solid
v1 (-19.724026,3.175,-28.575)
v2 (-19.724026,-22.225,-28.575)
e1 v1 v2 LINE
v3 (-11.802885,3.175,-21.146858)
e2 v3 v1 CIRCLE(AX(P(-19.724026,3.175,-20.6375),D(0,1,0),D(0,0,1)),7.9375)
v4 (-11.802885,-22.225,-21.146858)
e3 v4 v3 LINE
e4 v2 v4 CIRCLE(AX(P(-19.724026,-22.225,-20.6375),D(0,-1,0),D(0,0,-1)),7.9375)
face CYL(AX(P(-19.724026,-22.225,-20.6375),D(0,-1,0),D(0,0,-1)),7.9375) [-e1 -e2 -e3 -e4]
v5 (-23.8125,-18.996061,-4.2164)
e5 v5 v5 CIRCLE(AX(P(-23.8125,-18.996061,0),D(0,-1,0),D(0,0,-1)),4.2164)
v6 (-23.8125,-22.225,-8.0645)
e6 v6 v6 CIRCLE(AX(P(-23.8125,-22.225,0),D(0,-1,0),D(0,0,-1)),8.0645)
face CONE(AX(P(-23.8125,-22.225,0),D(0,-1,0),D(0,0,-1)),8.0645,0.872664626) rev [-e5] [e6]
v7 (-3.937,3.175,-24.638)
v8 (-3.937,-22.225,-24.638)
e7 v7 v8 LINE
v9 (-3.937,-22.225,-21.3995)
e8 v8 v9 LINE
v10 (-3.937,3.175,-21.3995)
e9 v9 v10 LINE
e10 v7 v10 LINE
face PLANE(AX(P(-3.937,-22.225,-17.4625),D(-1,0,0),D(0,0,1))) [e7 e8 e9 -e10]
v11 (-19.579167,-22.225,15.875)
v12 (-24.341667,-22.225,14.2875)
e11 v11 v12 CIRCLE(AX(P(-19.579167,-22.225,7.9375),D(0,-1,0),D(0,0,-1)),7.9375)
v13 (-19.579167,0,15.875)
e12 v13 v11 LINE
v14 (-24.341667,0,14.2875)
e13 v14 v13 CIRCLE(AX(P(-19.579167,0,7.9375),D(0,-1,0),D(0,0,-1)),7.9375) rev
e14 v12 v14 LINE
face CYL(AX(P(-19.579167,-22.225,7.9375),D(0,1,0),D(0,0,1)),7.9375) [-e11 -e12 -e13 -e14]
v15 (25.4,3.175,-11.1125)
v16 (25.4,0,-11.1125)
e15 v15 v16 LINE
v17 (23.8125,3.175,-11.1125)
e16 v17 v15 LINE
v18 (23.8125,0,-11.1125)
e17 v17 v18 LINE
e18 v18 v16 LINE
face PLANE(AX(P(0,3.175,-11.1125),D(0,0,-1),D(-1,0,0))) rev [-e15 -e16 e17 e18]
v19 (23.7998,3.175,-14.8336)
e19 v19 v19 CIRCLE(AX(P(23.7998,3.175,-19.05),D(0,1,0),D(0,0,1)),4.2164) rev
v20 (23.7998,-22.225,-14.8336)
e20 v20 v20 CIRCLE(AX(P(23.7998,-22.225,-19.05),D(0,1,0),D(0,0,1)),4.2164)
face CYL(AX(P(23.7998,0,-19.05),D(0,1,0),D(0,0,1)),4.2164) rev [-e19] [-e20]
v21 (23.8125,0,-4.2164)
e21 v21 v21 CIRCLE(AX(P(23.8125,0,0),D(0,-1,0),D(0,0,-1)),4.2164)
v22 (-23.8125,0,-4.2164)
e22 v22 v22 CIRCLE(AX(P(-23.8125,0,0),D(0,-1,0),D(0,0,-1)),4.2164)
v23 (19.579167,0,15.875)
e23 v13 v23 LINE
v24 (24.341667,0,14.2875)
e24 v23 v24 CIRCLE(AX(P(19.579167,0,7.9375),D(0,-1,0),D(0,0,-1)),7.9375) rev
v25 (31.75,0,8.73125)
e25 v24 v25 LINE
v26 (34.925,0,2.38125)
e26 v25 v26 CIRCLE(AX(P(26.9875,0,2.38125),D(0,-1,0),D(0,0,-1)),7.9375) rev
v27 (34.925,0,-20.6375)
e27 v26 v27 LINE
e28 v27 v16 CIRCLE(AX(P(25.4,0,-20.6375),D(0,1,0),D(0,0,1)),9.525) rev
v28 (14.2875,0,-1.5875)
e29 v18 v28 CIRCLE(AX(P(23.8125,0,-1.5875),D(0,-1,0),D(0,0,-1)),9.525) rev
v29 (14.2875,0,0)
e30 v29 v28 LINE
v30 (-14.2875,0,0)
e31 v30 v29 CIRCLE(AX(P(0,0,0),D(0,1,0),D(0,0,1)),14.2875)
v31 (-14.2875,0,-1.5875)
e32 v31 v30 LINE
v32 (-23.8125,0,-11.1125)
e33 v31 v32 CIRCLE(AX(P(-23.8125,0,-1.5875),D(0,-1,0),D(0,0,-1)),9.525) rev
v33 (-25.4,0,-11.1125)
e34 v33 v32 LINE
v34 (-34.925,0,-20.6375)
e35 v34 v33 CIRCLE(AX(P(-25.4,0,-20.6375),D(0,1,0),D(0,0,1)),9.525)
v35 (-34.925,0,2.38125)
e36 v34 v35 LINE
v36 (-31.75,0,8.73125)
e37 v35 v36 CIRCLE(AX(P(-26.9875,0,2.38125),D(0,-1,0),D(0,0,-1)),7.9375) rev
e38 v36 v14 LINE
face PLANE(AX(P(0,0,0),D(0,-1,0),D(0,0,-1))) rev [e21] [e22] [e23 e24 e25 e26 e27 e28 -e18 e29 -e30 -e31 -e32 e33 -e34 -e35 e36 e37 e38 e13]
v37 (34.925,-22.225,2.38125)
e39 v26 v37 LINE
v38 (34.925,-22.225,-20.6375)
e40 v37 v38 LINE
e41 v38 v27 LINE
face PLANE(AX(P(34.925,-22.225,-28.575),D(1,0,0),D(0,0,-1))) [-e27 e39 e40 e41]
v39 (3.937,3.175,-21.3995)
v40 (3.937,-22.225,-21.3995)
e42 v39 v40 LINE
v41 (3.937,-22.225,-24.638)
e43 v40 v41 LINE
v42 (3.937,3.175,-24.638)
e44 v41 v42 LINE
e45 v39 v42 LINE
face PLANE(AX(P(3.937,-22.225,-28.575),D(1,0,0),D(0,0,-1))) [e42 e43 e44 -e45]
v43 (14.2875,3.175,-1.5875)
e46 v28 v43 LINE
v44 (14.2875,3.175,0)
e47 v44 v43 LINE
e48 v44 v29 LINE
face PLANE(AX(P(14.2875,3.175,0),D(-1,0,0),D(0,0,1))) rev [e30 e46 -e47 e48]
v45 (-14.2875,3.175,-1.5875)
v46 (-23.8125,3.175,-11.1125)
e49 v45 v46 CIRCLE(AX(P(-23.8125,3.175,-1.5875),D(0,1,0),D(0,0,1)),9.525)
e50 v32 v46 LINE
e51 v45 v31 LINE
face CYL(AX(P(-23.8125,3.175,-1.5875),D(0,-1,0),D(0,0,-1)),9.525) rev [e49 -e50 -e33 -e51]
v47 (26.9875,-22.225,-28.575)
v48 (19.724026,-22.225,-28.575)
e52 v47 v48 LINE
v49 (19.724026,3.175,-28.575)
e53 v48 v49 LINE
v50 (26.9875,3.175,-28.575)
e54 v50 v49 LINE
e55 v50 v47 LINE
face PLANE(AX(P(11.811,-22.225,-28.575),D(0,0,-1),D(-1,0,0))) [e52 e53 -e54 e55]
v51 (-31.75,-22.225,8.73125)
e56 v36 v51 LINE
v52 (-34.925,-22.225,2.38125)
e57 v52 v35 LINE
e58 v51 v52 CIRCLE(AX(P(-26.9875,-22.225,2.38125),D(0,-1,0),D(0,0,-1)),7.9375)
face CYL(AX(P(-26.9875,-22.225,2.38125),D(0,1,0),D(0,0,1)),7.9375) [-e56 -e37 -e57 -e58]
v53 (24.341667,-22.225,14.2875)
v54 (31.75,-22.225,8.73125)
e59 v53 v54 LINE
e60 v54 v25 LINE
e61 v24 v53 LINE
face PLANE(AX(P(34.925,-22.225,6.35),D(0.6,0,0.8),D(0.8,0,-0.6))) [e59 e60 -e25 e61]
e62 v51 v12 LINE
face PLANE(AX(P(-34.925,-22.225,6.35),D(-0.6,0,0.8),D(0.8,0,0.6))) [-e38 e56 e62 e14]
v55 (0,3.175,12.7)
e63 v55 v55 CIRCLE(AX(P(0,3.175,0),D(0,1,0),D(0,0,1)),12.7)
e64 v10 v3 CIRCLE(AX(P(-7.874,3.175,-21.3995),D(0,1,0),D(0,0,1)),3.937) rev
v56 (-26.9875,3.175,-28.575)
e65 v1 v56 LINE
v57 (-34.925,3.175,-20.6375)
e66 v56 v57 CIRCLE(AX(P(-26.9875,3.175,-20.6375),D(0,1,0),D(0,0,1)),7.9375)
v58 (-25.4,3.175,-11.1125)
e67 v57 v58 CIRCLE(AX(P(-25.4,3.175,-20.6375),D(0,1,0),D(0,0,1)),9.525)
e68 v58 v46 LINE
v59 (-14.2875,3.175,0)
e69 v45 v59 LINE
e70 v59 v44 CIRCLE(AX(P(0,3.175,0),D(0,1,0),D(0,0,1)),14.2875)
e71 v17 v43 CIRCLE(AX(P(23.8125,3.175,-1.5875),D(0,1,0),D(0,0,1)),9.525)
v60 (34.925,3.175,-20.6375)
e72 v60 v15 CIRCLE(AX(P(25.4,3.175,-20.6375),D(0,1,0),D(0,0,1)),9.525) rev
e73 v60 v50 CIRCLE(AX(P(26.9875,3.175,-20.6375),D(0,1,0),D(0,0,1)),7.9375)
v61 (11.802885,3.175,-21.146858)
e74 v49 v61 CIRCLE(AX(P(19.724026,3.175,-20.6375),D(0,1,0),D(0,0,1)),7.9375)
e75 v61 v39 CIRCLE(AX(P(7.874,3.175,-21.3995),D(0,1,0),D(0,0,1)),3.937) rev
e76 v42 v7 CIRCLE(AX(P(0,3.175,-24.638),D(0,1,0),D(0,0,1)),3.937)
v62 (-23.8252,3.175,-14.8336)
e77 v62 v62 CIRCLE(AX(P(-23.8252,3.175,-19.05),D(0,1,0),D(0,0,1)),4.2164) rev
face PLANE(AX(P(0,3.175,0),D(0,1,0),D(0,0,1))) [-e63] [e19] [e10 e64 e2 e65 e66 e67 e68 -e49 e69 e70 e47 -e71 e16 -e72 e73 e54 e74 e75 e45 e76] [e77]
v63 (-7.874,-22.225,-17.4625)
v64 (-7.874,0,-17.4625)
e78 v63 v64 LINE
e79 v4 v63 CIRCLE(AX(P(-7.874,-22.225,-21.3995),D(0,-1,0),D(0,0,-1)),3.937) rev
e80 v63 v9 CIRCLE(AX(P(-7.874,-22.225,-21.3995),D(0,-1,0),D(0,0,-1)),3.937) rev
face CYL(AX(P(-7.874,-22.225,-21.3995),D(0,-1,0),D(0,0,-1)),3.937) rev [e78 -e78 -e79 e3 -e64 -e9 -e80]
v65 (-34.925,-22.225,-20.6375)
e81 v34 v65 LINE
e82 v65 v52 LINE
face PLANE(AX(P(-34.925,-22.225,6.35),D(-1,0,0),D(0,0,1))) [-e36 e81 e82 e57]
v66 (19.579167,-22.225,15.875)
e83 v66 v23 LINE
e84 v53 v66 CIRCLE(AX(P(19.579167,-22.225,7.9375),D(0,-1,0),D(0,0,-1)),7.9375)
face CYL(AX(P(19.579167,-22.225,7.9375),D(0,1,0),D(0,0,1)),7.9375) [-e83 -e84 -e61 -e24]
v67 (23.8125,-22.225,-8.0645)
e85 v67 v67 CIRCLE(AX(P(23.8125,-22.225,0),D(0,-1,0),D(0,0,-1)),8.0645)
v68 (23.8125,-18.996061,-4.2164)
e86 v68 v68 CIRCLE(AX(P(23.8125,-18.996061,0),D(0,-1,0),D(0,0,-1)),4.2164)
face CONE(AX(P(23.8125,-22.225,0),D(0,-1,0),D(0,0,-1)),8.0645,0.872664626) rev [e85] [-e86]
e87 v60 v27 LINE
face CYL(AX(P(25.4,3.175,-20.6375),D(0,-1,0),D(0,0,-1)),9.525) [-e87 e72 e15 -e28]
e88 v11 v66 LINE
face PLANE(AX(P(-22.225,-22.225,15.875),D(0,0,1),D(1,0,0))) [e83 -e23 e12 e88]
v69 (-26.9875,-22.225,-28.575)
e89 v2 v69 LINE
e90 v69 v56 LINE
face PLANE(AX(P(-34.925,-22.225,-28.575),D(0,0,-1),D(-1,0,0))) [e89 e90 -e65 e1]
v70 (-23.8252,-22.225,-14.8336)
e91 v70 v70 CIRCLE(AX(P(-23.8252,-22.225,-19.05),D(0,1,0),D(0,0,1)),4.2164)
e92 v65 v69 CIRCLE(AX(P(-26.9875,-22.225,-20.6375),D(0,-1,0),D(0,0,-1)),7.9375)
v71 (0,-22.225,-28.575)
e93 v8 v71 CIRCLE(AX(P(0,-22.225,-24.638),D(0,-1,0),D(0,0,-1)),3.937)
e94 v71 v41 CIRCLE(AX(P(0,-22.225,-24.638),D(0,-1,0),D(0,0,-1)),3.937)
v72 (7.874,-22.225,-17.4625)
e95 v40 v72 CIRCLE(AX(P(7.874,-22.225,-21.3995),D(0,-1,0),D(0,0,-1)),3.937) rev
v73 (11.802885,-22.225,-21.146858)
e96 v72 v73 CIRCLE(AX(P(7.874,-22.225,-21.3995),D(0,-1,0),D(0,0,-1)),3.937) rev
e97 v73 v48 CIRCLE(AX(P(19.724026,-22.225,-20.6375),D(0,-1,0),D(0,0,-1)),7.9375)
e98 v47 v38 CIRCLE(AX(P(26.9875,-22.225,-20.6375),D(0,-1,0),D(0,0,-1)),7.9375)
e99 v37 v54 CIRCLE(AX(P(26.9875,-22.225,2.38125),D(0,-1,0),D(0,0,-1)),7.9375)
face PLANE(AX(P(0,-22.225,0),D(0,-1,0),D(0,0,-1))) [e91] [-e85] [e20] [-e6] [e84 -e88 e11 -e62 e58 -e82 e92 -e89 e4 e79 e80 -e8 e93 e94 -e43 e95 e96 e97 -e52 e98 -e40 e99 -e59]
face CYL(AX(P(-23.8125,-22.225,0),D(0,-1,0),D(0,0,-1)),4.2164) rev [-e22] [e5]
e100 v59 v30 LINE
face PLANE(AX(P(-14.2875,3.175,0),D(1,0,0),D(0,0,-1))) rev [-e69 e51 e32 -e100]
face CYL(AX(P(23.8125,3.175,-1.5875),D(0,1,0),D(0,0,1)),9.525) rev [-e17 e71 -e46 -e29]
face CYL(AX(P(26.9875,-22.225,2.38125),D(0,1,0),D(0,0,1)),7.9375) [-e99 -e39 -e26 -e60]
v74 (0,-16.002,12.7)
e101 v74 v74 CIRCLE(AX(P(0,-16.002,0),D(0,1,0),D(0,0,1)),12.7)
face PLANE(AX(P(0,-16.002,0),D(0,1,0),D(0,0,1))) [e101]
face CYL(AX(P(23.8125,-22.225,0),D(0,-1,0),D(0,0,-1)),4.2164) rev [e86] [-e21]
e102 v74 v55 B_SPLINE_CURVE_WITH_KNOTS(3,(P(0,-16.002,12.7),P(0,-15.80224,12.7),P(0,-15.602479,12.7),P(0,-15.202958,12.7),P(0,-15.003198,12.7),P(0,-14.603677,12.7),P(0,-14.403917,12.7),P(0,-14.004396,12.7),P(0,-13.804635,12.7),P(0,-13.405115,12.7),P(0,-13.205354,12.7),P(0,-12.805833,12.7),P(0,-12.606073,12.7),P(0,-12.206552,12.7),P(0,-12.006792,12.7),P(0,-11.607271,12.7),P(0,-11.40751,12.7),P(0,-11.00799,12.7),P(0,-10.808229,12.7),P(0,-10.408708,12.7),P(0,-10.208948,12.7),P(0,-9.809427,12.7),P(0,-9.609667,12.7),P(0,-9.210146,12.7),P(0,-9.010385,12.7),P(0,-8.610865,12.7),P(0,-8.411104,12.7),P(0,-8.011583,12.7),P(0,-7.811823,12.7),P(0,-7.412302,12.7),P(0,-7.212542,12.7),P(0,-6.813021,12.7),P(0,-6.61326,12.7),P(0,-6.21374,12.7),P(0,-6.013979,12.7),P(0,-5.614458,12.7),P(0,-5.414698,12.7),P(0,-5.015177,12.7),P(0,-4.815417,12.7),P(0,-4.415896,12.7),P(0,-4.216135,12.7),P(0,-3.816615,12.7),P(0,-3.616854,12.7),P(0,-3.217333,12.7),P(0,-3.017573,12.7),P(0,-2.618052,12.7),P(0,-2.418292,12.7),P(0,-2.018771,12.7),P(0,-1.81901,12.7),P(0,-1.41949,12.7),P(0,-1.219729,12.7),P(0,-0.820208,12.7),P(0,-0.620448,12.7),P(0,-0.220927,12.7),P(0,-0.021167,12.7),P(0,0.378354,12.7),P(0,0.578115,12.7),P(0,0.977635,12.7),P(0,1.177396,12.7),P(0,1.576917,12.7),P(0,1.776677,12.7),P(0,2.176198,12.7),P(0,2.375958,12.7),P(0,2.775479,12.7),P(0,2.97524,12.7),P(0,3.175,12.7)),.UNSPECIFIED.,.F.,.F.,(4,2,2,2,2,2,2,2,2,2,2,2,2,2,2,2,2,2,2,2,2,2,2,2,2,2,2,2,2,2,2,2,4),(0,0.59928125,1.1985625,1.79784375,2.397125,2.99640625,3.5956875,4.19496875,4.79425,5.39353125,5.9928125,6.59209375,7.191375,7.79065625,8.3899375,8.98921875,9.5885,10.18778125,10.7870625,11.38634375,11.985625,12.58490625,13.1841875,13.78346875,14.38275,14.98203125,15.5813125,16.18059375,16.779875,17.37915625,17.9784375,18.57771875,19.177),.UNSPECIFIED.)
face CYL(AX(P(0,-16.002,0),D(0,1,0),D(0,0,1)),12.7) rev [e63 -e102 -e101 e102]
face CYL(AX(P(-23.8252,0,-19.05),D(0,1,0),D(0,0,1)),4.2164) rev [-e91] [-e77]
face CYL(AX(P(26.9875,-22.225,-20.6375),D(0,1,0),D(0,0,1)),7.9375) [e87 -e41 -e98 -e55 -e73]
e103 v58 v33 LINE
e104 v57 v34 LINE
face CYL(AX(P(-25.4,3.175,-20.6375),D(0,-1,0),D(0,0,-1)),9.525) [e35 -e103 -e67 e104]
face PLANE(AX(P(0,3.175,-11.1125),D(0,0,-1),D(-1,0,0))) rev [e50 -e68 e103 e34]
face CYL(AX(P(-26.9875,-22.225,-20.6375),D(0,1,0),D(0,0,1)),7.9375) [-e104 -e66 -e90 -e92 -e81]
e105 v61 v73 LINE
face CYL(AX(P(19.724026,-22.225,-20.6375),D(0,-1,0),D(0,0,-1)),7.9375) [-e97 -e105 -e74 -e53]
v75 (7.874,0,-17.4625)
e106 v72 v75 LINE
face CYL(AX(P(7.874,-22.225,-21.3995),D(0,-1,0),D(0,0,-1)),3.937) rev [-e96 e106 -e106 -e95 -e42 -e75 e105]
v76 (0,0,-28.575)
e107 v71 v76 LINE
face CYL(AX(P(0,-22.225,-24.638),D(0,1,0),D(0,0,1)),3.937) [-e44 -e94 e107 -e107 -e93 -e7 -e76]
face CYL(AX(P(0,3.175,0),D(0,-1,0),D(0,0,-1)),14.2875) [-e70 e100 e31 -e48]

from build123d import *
from build123d.topology import SkipClean

# Parameters (mm, degrees)
BOSS_EXTRUDE1_DEPTH                                 = 22.225
FILLET1_R                                           = 3.937
FILLET3_R                                           = 7.9375
F_5_16_CLEARANCE_HOLE1_D                            = 8.4328
BOSS_EXTRUDE2_OUTLINE_R                             = 4.2164
BOSS_EXTRUDE2_DEPTH                                 = 3.175
FILLET4_R                                           = 9.525
FILLET5_R                                           = 9.525
SKETCH9_R                                           = 12.7
CUT_EXTRUDE1_DEPTH                                  = 19.177
CSK_FOR_5_16_FLAT_HEAD_MACHINE_SCREW_10_D           = 8.4328
CSK_FOR_5_16_FLAT_HEAD_MACHINE_SCREW_10_CSINK_D     = 16.129
CSK_FOR_5_16_FLAT_HEAD_MACHINE_SCREW_10_CSINK_ANGLE = 100


# Read off the part's stored shape, not the designer's step: Boss-Extrude2
with BuildPart() as part:
    # Sketch2 → Boss-Extrude1 (new body)
    with BuildSketch(Plane(origin=(0, 0, 0), x_dir=(1, 0, 0), z_dir=(0, 1, 0))):
        Polygon((-34.925, 28.575), (-11.811, 28.575), (-11.811, 17.4625), (-3.937, 17.4625), (-3.937, 28.575), (3.937, 28.575), (3.937, 17.4625), (11.811, 17.4625), (11.811, 28.575), (34.925, 28.575), (34.925, -6.35), (22.225, -15.875), (-22.225, -15.875), (-34.925, -6.35), align=None)
    extrude(amount=-BOSS_EXTRUDE1_DEPTH)

    # Fillet1
    fillet1_edges = [part.edges().sort_by_distance(p)[0] for p in [
        (3.937, -11.1125, -28.575),
        (-3.937, -11.1125, -28.575),
        (11.811, -11.1125, -17.4625),
        (3.937, -11.1125, -17.4625),
        (-3.937, -11.1125, -17.4625),
        (-11.811, -11.1125, -17.4625),
    ]]
    fillet(fillet1_edges, radius=FILLET1_R - 0.0001)  # a hair under: the kernel refuses the full size

    # Fillet3
    fillet3_edges = [part.edges().sort_by_distance(p)[0] for p in [
        (22.225, -11.1125, 15.875),
        (-22.225, -11.1125, 15.875),
        (-34.925, -11.1125, 6.35),
        (34.925, -11.1125, 6.35),
        (34.925, -11.1125, -28.575),
        (-34.925, -11.1125, -28.575),
        (-11.811, -11.1125, -28.575),
        (11.811, -11.1125, -28.575),
    ]]
    fillet(fillet3_edges, radius=FILLET3_R)

    # 5/16 Clearance Hole1 (through all)
    with Locations(Plane(origin=(0, 0, 0), x_dir=(1, 0, 0), z_dir=(0, 1, 0))):
        with Locations((-23.8252, 19.05), (23.7998, 19.05)):
            Hole(F_5_16_CLEARANCE_HOLE1_D / 2)

    # Boss-Extrude2 outline → Boss-Extrude2 (add)
    with SkipClean():  # the faces are left unmerged after this step: merging them gives an invalid solid
        with BuildSketch(Plane(origin=(0, 0, 0), x_dir=(1, 0, 0), z_dir=(0, 1, 0))):
            with BuildLine():
                ThreePointArc((-11.802885486, 21.146858289), (-14.294436515, 26.427445495), (-19.72402558, 28.575))
                Line((-19.72402558, 28.575), (-26.9875, 28.575))
                ThreePointArc((-26.9875, 28.575), (-32.600160076, 26.250160076), (-34.925, 20.6375))
                ThreePointArc((-34.925, 20.6375), (-32.135192091, 13.902307909), (-25.4, 11.1125))
                Line((-25.4, 11.1125), (-14.2875, 11.1125))
                Line((-14.2875, 11.1125), (-14.2875, 0))
                ThreePointArc((-14.2875, 0), (0, -14.2875), (14.2875, 0))
                Line((14.2875, 0), (14.2875, 11.1125))
                Line((14.2875, 11.1125), (25.4, 11.1125))
                ThreePointArc((25.4, 11.1125), (32.135192091, 13.902307909), (34.925, 20.6375))
                ThreePointArc((34.925, 20.6375), (32.600160076, 26.250160076), (26.9875, 28.575))
                Line((26.9875, 28.575), (19.72402558, 28.575))
                ThreePointArc((19.72402558, 28.575), (14.294436515, 26.427445495), (11.802885486, 21.146858289))
                ThreePointArc((11.802885486, 21.146858289), (7.747614004, 17.464529151), (3.937, 21.3995))
                Line((3.937, 21.3995), (3.937, 24.638))
                ThreePointArc((3.937, 24.638), (0, 28.575), (-3.937, 24.638))
                Line((-3.937, 24.638), (-3.937, 21.3995))
                ThreePointArc((-3.937, 21.3995), (-7.747614004, 17.464529151), (-11.802885486, 21.146858289))
            make_face()
            with Locations((-23.8252, 19.05)):
                Circle(BOSS_EXTRUDE2_OUTLINE_R, mode=Mode.SUBTRACT)
            with Locations((23.7998, 19.05)):
                Circle(BOSS_EXTRUDE2_OUTLINE_R, mode=Mode.SUBTRACT)
        extrude(amount=BOSS_EXTRUDE2_DEPTH)
    add(part.part.scale(1), mode=Mode.REPLACE)  # the faces are merged on a copy

    # Fillet4
    fillet4_edges = [part.edges().sort_by_distance(p)[0] for p in [
        (-14.2875, 1.5875, -11.1125),
    ]]
    fillet(fillet4_edges, radius=FILLET4_R)

    # Fillet5
    fillet5_edges = [part.edges().sort_by_distance(p)[0] for p in [
        (14.2875, 1.5875, -11.1125),
    ]]
    fillet(fillet5_edges, radius=FILLET5_R)

    # Sketch9 → Cut-Extrude1 (cut)
    with SkipClean():  # the faces are left unmerged after this step: merging them gives an invalid solid
        with BuildSketch(Plane(origin=(0, 3.175, 0), x_dir=(1, 0, 0), z_dir=(0, 1, 0))):
            with Locations(Location((0, 0, 0), (0, 0, 270))):
                Circle(SKETCH9_R)
        extrude(amount=-CUT_EXTRUDE1_DEPTH, mode=Mode.SUBTRACT)

    # CSK for 5/16 Flat Head Machine Screw (100)2 (through all)
    with Locations(Plane(origin=(0, -22.225, 0), x_dir=(-1, 0, 0), z_dir=(0, -1, 0))):
        with Locations((-23.8125, 0), (23.8125, 0)):
            CounterSinkHole(CSK_FOR_5_16_FLAT_HEAD_MACHINE_SCREW_10_D / 2, CSK_FOR_5_16_FLAT_HEAD_MACHINE_SCREW_10_CSINK_D / 2, counter_sink_angle=CSK_FOR_5_16_FLAT_HEAD_MACHINE_SCREW_10_CSINK_ANGLE)


solid = part.part
